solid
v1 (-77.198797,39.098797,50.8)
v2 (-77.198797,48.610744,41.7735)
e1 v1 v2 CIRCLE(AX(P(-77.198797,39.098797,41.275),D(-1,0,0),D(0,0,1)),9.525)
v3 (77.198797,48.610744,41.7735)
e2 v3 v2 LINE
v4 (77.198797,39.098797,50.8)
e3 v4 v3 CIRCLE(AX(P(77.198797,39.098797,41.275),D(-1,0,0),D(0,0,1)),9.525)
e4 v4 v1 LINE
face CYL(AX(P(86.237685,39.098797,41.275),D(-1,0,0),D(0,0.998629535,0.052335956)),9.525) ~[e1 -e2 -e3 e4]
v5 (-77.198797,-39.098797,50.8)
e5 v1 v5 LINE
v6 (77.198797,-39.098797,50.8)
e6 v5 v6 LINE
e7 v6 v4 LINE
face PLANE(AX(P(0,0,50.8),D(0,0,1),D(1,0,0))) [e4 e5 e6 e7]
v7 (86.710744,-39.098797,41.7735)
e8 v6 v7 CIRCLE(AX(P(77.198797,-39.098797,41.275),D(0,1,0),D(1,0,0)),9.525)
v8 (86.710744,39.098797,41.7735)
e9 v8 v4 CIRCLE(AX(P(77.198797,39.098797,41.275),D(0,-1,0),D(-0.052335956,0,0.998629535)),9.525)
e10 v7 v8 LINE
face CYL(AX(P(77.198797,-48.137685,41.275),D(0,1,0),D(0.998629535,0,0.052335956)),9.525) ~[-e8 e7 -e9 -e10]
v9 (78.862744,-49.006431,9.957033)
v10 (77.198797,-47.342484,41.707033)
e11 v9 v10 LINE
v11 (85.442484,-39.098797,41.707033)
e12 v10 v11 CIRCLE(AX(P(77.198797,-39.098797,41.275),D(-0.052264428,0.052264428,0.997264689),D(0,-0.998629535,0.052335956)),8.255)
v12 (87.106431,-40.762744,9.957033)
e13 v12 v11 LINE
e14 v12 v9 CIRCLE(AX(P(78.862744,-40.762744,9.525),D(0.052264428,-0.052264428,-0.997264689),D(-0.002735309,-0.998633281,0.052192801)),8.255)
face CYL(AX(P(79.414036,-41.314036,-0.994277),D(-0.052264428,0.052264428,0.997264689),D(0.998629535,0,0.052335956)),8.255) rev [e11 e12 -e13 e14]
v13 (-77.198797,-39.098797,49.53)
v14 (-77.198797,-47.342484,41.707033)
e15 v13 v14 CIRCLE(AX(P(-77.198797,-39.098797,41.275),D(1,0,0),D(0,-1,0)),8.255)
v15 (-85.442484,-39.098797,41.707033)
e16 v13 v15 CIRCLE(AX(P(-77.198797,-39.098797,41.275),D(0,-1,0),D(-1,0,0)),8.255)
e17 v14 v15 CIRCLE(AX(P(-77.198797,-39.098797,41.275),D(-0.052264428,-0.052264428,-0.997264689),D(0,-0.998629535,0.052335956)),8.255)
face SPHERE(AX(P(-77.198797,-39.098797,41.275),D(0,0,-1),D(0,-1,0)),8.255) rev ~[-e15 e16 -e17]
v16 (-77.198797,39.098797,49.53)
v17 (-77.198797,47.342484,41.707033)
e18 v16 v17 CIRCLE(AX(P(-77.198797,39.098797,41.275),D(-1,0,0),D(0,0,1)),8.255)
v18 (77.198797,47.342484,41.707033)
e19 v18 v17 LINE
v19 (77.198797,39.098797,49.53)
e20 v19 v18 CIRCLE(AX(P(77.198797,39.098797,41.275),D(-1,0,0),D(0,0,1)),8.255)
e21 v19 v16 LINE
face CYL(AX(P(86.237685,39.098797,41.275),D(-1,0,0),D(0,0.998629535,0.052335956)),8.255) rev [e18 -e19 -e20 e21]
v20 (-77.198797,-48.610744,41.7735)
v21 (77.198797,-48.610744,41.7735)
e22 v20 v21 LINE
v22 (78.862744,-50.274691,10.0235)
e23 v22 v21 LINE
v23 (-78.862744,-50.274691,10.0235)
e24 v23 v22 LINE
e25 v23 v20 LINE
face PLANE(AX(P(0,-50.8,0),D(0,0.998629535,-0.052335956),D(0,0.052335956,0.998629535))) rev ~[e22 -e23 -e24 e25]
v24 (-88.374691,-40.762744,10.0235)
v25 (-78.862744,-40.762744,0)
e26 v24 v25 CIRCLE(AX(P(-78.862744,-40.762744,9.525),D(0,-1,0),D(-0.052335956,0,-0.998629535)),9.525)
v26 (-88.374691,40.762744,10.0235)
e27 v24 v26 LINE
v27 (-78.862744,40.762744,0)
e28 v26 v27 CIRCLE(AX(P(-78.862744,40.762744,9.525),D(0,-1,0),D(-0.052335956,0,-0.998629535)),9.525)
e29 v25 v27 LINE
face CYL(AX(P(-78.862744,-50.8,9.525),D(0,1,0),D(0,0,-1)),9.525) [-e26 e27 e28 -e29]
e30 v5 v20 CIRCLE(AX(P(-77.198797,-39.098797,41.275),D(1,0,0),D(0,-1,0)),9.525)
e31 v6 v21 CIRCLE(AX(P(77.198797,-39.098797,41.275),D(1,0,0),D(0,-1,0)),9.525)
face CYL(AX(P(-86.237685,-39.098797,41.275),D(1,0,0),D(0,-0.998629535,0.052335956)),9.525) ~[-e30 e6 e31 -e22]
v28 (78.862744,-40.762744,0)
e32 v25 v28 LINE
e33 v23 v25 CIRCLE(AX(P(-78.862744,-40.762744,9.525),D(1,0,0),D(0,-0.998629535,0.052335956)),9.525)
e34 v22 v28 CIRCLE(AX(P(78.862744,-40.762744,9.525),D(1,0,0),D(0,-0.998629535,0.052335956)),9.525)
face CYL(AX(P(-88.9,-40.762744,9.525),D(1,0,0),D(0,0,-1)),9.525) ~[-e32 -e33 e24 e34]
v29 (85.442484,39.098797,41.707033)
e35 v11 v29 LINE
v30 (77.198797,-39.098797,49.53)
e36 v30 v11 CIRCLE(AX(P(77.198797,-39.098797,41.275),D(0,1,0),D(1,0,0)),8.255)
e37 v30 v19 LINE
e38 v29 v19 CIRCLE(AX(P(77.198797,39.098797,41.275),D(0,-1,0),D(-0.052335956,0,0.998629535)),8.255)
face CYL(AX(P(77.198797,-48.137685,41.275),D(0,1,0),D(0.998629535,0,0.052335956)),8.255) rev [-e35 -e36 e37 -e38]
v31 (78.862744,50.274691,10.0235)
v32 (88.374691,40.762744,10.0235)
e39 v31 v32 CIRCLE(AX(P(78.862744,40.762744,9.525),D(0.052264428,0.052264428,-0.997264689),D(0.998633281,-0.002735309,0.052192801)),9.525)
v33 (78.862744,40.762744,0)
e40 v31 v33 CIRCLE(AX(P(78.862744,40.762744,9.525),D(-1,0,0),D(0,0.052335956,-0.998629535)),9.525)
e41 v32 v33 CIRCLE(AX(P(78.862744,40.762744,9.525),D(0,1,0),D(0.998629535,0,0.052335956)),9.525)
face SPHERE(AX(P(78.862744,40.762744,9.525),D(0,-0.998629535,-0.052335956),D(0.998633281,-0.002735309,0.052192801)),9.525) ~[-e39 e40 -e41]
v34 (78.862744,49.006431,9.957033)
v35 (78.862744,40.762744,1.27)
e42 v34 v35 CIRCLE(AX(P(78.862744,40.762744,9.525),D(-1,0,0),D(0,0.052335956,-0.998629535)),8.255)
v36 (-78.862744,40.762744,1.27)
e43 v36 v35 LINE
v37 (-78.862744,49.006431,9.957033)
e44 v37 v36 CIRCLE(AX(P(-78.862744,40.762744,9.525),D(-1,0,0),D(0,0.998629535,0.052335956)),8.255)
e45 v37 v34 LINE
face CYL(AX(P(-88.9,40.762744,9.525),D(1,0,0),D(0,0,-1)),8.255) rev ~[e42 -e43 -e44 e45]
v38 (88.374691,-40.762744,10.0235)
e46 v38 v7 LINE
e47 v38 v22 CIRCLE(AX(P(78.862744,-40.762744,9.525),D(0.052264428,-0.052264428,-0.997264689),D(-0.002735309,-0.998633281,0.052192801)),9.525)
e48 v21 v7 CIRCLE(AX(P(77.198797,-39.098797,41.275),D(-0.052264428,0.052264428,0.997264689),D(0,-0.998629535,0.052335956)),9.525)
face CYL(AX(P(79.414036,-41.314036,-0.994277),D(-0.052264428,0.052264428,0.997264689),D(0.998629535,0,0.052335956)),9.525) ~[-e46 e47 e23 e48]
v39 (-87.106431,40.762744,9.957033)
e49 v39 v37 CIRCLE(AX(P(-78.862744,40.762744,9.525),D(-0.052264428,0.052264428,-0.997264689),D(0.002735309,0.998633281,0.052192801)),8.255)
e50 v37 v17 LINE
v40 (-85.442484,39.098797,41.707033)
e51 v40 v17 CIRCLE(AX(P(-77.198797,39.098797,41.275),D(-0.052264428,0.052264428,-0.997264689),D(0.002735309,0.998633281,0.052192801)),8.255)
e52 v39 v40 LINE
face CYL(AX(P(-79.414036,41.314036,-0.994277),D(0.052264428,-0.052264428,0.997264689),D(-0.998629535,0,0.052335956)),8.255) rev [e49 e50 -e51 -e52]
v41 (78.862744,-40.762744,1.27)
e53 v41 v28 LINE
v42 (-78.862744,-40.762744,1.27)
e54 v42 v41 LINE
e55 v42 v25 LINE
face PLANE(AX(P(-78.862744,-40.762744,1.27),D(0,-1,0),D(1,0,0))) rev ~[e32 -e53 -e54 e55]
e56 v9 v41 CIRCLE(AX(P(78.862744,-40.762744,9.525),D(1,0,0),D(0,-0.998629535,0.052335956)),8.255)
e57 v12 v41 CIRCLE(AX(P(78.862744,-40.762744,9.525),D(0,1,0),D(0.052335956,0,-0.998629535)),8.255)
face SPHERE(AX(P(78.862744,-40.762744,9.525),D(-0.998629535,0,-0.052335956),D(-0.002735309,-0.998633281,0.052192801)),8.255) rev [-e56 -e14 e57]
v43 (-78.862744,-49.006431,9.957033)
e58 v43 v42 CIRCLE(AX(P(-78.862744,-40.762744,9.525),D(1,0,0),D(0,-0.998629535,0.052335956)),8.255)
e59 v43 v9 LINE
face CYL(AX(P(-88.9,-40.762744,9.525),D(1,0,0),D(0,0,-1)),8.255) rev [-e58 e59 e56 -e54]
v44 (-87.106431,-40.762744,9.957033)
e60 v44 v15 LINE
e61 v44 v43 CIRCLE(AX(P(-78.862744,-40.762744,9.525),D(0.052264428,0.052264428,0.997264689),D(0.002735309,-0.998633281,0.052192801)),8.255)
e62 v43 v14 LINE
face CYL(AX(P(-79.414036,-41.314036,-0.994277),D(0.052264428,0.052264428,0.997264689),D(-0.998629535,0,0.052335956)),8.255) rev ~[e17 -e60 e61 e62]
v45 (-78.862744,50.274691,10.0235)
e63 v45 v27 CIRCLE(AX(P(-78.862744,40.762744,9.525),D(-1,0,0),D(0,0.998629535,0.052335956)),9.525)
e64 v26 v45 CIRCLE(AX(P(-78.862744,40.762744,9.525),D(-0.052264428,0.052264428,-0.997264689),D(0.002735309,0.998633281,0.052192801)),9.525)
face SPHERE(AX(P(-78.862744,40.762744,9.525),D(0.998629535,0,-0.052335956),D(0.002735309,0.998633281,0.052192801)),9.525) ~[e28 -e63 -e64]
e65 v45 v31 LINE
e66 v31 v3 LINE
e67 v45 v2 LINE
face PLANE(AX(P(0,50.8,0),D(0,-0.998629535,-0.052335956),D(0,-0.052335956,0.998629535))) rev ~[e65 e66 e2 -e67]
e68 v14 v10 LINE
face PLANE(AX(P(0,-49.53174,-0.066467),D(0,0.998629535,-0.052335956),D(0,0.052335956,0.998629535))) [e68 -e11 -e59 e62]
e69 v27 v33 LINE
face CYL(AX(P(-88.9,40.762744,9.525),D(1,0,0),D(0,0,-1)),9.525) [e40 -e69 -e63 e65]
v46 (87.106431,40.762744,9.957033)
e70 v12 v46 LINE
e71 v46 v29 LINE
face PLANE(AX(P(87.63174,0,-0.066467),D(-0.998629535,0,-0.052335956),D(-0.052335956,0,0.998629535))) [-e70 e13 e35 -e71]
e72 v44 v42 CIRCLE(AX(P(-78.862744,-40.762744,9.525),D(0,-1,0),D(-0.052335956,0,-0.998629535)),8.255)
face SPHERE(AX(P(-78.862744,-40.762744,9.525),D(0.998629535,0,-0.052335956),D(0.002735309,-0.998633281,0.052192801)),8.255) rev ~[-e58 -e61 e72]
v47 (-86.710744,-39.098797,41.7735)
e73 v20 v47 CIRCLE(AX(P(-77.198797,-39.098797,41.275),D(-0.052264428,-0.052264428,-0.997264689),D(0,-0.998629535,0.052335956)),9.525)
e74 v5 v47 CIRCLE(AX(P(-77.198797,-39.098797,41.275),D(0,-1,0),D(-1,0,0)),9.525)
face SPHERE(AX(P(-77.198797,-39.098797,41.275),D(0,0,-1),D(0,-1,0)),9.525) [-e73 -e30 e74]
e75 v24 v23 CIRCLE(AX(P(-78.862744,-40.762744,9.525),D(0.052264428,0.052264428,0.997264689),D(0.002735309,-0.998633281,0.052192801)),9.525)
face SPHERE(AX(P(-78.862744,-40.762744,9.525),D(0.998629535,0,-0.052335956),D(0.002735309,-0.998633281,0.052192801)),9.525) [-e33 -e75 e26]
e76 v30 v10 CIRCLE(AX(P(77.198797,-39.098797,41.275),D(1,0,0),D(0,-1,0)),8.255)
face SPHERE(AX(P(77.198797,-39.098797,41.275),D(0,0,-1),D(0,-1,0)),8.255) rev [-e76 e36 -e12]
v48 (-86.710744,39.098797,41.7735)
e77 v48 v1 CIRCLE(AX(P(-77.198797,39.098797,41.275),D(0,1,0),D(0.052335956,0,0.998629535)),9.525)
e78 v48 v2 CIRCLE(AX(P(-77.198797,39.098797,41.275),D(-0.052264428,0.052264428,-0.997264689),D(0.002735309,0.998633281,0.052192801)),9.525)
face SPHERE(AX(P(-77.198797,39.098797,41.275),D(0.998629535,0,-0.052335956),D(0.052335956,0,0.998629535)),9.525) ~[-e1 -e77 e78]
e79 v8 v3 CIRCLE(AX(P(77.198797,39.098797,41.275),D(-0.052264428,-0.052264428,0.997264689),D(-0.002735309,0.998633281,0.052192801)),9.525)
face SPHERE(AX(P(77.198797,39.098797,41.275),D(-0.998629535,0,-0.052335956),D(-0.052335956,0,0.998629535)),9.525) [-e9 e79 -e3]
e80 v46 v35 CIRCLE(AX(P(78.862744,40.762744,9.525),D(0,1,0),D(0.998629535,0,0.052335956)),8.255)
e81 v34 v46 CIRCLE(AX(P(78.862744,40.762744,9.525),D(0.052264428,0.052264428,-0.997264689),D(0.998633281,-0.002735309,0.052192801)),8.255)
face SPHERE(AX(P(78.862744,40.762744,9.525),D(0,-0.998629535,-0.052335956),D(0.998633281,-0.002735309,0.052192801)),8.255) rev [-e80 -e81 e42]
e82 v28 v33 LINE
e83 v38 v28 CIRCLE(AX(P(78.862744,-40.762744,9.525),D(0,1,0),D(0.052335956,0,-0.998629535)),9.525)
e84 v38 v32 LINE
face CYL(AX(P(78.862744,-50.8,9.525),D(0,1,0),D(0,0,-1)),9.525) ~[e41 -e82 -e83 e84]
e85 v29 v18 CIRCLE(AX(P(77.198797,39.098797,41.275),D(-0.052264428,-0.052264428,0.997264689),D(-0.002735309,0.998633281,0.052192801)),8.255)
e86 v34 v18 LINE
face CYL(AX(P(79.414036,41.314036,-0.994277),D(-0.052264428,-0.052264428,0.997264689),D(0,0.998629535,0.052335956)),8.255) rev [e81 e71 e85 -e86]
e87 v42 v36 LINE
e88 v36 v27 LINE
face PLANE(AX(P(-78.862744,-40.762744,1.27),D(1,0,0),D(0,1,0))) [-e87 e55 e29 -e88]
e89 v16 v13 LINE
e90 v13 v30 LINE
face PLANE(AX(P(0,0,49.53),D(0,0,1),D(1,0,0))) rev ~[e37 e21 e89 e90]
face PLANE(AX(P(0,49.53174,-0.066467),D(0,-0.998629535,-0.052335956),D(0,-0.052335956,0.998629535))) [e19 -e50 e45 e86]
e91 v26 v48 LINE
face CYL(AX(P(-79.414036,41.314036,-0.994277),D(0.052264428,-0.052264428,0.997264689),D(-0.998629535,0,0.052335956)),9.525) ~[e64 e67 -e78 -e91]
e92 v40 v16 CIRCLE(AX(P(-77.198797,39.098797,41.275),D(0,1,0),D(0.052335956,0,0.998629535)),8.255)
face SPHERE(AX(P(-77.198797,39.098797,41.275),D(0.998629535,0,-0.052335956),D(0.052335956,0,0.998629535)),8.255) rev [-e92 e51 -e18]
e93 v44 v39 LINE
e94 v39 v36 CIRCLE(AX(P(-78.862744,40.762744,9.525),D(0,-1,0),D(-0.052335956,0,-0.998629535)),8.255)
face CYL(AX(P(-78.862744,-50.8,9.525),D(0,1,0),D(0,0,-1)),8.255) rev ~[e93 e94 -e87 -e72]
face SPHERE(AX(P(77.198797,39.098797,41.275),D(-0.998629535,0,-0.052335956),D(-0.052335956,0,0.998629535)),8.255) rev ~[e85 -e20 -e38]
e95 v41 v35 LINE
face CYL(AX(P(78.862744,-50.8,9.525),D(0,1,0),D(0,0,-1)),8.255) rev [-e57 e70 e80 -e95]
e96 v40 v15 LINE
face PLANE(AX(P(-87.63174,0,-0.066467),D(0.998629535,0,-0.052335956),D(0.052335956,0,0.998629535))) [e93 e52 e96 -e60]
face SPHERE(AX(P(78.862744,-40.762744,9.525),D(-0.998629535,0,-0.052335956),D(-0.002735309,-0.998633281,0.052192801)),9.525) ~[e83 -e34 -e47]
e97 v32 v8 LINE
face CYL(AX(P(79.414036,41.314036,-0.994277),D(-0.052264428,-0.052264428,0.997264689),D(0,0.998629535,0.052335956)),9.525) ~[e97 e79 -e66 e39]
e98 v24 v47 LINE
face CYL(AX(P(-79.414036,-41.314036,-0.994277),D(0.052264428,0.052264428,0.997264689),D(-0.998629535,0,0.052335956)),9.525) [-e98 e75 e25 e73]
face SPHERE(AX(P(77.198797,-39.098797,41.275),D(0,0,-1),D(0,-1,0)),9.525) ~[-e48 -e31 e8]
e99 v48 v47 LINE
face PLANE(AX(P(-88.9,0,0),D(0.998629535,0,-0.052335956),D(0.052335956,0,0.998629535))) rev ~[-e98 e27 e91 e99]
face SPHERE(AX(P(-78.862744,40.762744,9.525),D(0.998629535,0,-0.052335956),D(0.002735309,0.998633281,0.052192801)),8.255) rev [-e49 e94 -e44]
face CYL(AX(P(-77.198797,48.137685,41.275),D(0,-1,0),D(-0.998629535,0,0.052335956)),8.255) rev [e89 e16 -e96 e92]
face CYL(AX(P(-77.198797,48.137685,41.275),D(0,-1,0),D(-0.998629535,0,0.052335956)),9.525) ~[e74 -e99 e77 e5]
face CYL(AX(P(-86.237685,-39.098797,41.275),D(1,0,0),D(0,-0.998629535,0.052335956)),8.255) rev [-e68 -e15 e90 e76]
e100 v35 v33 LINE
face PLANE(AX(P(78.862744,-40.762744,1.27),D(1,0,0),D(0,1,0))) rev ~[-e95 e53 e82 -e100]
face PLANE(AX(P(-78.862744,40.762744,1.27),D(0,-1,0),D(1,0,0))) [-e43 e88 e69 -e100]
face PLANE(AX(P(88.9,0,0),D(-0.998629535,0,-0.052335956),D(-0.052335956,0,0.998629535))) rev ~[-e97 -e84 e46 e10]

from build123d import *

# Parameters (mm, degrees)
F0_W     = 177.8
F0_H     = 101.6
F1_DEPTH = 50.8
F1_TAPER = 3
F2_R     = 9.525
F3_T     = -1.27


# Not quite as in the source:
# - a shell that OpenCascade refuses in one call is made with other operations: the cavity is built on its own and cut out


with BuildPart() as f1:
    # F0 (on Top) → F1 (new body)
    with BuildSketch(Plane.XY):
        Rectangle(F0_W, F0_H)
    extrude(amount=F1_DEPTH, taper=F1_TAPER)

    # F2
    f2_edges = [f1.edges().sort_by_distance(p)[0] for p in [
        (0, -50.8, 0),
        (87.568842, -49.468842, 25.4),
        (-87.568842, -49.468842, 25.4),
        (0, -48.137685, 50.8),
        (0, 48.137685, 50.8),
        (-86.237685, 0, 50.8),
        (86.237685, 0, 50.8),
        (88.9, 0, 0),
        (87.568842, 49.468842, 25.4),
        (0, 50.8, 0),
        (-87.568842, 49.468842, 25.4),
        (-88.9, 0, 0),
    ]]
    fillet(f2_edges, radius=F2_R)

    # F3: a shell. OpenCascade refuses it in one call, so the cavity is built on its own and cut out:
    # the body offset inwards by the wall thickness, plus a prism from it out through each open face.
    f3_core = offset(f1.part, amount=F3_T, mode=Mode.PRIVATE)
    f3_exits = [f3_core.faces().sort_by_distance(p)[0] for p in [
        (0, 0, 1.27),
    ]]
    add(f3_core, mode=Mode.SUBTRACT)
    extrude(f3_exits, amount=-F3_T, mode=Mode.SUBTRACT)


solid = f1.part
